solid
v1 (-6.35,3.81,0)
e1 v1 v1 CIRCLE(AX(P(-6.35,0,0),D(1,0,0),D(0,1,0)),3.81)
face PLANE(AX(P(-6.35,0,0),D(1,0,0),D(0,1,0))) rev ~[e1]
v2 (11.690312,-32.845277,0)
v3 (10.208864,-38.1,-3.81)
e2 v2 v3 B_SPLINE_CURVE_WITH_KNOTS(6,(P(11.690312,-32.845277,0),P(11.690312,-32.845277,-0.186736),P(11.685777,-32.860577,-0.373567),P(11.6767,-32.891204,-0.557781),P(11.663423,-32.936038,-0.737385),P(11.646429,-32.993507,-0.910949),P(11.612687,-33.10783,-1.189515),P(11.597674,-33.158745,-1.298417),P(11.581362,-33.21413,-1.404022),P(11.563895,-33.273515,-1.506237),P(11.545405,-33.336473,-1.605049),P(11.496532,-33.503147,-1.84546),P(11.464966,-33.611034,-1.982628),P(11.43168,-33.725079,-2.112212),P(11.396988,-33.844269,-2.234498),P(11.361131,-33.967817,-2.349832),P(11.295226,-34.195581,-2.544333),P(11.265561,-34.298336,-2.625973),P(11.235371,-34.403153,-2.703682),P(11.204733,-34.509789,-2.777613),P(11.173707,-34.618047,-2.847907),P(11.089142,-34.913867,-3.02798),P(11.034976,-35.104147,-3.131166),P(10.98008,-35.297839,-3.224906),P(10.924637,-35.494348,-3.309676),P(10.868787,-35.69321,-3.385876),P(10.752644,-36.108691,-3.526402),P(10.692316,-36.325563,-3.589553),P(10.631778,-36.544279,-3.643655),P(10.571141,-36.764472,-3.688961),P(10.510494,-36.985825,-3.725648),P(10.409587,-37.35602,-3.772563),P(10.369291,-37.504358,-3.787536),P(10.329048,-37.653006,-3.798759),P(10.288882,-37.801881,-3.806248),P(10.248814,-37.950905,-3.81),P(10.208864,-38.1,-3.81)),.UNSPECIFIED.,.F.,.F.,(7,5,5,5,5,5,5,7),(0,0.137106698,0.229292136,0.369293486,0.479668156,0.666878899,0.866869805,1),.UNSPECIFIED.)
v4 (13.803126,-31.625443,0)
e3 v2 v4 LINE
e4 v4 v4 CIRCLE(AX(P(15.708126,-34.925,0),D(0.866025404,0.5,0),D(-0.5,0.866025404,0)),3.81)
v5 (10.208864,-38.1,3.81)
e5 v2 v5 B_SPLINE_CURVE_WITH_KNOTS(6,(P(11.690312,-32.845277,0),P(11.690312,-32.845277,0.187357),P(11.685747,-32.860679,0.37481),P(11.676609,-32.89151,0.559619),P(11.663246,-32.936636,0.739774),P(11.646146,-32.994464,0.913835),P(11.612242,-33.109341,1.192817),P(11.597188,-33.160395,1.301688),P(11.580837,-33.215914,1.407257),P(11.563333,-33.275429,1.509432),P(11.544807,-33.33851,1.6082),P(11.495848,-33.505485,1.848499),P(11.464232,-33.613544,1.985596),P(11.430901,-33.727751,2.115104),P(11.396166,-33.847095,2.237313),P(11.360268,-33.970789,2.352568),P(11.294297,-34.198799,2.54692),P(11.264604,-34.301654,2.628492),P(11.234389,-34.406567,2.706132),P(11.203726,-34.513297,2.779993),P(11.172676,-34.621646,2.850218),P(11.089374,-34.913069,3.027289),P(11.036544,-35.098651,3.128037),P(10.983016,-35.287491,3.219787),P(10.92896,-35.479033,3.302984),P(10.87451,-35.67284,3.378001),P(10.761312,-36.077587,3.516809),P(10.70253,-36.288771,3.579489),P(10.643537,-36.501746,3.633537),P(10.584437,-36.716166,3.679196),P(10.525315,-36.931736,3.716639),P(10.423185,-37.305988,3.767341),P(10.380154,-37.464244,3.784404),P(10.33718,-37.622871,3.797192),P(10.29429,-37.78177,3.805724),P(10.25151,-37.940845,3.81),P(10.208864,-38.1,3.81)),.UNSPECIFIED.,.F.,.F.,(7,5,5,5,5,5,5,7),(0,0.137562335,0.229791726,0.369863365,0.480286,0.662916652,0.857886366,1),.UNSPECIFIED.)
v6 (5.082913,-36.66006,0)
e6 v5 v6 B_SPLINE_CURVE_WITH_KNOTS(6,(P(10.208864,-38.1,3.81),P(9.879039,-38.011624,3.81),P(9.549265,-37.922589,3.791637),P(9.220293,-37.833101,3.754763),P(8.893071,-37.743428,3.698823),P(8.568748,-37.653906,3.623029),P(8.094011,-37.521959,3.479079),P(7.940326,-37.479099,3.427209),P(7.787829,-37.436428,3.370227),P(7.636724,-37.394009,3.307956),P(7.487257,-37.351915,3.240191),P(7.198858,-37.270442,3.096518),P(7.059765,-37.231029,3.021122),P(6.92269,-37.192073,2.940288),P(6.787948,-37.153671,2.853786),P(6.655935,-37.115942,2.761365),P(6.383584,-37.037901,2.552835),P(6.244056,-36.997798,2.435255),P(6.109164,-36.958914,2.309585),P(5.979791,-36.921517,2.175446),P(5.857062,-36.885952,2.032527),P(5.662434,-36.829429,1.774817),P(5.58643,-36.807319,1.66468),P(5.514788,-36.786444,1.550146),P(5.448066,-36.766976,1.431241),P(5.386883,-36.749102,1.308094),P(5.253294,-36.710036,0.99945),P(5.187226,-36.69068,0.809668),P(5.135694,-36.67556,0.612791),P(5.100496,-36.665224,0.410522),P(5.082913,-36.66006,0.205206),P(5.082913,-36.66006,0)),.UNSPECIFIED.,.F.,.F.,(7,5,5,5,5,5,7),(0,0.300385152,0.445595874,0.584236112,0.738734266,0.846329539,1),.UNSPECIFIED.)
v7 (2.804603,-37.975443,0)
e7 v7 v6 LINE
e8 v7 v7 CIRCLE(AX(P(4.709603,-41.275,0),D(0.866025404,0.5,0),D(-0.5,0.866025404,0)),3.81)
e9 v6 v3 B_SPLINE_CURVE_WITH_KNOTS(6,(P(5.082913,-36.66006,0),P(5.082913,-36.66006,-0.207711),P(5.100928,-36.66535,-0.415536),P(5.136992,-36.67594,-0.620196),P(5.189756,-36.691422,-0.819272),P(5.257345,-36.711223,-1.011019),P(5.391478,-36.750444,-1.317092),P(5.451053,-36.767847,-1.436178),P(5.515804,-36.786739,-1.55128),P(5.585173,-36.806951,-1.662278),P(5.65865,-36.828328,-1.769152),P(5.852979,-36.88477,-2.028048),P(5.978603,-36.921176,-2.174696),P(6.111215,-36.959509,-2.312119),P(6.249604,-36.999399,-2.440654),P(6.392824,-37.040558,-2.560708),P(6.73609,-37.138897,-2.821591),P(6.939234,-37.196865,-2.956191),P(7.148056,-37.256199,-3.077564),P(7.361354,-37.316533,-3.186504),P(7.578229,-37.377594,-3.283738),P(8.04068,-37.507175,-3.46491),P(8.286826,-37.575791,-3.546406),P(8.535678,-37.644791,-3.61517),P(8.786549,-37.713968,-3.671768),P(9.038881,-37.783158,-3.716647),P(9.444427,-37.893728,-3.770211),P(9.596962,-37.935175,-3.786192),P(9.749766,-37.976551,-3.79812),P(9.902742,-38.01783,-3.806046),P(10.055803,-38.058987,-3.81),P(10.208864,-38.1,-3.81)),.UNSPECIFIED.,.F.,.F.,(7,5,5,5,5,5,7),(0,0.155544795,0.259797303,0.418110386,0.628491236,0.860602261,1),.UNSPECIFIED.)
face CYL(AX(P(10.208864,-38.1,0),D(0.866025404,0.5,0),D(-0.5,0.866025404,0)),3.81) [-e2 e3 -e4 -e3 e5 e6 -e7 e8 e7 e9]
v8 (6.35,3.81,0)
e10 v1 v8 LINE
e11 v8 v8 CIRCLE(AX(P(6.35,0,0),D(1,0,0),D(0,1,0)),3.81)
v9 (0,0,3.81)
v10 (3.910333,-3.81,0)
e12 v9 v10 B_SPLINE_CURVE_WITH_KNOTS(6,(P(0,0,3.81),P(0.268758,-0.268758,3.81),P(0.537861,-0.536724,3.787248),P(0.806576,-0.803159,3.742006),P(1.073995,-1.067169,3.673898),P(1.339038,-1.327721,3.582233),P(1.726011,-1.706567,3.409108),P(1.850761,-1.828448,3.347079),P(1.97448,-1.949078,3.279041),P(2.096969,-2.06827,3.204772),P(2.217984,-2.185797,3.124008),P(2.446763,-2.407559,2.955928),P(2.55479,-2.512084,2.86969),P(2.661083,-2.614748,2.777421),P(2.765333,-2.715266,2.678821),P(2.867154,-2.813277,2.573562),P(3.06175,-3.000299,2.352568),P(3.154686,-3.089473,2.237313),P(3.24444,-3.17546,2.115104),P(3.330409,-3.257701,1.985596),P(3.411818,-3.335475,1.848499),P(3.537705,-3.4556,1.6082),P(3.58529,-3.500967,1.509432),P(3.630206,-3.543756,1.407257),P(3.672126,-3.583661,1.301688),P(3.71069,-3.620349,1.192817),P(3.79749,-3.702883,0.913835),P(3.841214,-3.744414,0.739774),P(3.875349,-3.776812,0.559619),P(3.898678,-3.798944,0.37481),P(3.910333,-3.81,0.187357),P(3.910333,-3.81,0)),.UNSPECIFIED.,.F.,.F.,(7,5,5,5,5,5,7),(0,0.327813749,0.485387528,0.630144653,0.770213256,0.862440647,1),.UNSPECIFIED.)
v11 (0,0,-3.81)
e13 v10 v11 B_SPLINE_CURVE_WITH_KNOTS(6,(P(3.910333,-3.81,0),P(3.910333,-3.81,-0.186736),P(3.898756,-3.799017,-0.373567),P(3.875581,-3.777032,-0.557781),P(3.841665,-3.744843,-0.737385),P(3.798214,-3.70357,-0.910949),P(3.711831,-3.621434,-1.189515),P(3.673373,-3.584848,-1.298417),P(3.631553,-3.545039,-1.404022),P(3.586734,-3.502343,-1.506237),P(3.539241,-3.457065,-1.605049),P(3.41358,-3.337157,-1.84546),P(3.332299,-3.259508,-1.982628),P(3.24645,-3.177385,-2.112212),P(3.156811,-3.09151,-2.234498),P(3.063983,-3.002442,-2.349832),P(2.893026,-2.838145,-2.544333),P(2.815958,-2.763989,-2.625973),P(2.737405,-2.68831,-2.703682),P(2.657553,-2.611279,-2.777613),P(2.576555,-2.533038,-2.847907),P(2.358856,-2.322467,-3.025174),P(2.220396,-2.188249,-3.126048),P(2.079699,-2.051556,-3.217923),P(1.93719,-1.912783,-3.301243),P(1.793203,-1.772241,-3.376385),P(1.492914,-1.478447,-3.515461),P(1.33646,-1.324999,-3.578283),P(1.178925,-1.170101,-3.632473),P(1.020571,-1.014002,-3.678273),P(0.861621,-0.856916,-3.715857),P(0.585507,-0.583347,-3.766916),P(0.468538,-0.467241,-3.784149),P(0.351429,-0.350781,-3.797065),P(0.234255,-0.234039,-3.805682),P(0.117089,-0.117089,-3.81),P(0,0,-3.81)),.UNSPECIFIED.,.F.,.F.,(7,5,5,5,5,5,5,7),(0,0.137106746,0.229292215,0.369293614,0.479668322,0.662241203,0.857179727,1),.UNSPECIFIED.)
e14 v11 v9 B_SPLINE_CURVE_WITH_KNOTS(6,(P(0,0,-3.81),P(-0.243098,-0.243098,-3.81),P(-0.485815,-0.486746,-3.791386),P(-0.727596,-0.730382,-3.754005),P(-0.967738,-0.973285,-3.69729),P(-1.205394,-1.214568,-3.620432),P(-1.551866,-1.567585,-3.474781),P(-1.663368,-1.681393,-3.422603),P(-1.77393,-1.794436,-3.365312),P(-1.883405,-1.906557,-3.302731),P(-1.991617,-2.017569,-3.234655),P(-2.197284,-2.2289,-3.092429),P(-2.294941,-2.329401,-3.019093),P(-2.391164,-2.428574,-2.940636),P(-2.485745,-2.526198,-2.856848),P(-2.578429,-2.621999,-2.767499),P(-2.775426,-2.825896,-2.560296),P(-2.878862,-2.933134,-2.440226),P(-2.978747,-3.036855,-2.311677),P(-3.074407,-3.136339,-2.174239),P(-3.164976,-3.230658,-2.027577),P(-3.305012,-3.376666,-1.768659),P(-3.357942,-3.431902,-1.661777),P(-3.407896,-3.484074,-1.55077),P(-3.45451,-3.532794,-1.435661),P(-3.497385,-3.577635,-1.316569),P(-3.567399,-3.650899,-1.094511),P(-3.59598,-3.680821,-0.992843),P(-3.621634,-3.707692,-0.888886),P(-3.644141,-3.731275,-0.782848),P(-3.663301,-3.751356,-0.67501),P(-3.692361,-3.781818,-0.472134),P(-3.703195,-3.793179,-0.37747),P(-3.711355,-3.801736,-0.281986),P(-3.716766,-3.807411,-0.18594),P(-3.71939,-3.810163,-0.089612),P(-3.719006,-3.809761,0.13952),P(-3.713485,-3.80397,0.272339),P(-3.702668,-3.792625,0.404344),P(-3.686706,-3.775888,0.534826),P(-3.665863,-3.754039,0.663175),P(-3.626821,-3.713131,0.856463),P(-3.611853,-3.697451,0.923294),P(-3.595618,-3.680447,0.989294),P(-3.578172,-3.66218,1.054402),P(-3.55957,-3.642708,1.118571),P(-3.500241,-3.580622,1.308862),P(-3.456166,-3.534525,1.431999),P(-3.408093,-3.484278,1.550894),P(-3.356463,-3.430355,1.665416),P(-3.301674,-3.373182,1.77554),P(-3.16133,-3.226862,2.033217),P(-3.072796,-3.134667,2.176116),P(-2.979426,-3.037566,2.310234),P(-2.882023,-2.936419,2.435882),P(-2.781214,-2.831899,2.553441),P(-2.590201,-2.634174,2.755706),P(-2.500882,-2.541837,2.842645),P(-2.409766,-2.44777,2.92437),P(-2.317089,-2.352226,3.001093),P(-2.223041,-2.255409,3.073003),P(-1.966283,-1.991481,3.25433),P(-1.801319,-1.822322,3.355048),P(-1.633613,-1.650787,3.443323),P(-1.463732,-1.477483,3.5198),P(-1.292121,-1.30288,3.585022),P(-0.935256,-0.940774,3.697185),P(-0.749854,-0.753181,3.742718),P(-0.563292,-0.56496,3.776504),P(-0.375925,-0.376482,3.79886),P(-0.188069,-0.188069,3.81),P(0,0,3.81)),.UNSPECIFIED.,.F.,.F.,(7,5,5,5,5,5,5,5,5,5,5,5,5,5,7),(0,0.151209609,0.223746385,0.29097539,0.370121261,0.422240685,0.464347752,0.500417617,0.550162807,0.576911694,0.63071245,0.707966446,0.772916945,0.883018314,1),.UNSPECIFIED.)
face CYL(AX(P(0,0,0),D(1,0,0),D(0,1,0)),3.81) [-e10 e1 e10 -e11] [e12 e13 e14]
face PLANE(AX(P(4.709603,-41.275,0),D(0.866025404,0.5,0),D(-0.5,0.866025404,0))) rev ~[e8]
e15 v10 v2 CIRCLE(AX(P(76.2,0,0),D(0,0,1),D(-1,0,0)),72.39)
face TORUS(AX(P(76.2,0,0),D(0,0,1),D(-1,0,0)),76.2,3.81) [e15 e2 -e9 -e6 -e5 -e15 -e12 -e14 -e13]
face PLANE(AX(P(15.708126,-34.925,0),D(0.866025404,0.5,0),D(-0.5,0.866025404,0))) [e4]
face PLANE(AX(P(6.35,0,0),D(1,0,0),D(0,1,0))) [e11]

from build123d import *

# Parameters (mm, degrees)
F0_R     = 3.81
F3_R     = 3.81
F4_DEPTH = 6.35
F7_R     = 3.81
F8_DEPTH = 6.35


with BuildPart() as f2:
    # F2: sweep along a path in F1
    with BuildLine(Plane.XY) as f2_path:
        ThreePointArc((0, 0), (2.5964520368, -19.7220112368), (10.2088642316, -38.1))
    # F0 (on Front) → F2 (sweep)
    with BuildSketch(Plane.XZ):
        Circle(F0_R)
    sweep(path=f2_path.line)

    # F3 (on Right) → F4 (join, symmetric)
    with BuildSketch(Plane.YZ):
        Circle(F3_R)
    extrude(amount=F4_DEPTH, both=True)

    # F7 (on face) → F8 (join, symmetric)
    with BuildSketch(Plane(origin=(-8.8411357684, -5.1044321158, 0), x_dir=(-0.5, 0.8660254038, 0), z_dir=(0.8660254038, 0.5, 0))):
        with Locations((-38.1, 0)):
            Circle(F7_R)
    extrude(amount=F8_DEPTH, both=True)


solid = f2.part
